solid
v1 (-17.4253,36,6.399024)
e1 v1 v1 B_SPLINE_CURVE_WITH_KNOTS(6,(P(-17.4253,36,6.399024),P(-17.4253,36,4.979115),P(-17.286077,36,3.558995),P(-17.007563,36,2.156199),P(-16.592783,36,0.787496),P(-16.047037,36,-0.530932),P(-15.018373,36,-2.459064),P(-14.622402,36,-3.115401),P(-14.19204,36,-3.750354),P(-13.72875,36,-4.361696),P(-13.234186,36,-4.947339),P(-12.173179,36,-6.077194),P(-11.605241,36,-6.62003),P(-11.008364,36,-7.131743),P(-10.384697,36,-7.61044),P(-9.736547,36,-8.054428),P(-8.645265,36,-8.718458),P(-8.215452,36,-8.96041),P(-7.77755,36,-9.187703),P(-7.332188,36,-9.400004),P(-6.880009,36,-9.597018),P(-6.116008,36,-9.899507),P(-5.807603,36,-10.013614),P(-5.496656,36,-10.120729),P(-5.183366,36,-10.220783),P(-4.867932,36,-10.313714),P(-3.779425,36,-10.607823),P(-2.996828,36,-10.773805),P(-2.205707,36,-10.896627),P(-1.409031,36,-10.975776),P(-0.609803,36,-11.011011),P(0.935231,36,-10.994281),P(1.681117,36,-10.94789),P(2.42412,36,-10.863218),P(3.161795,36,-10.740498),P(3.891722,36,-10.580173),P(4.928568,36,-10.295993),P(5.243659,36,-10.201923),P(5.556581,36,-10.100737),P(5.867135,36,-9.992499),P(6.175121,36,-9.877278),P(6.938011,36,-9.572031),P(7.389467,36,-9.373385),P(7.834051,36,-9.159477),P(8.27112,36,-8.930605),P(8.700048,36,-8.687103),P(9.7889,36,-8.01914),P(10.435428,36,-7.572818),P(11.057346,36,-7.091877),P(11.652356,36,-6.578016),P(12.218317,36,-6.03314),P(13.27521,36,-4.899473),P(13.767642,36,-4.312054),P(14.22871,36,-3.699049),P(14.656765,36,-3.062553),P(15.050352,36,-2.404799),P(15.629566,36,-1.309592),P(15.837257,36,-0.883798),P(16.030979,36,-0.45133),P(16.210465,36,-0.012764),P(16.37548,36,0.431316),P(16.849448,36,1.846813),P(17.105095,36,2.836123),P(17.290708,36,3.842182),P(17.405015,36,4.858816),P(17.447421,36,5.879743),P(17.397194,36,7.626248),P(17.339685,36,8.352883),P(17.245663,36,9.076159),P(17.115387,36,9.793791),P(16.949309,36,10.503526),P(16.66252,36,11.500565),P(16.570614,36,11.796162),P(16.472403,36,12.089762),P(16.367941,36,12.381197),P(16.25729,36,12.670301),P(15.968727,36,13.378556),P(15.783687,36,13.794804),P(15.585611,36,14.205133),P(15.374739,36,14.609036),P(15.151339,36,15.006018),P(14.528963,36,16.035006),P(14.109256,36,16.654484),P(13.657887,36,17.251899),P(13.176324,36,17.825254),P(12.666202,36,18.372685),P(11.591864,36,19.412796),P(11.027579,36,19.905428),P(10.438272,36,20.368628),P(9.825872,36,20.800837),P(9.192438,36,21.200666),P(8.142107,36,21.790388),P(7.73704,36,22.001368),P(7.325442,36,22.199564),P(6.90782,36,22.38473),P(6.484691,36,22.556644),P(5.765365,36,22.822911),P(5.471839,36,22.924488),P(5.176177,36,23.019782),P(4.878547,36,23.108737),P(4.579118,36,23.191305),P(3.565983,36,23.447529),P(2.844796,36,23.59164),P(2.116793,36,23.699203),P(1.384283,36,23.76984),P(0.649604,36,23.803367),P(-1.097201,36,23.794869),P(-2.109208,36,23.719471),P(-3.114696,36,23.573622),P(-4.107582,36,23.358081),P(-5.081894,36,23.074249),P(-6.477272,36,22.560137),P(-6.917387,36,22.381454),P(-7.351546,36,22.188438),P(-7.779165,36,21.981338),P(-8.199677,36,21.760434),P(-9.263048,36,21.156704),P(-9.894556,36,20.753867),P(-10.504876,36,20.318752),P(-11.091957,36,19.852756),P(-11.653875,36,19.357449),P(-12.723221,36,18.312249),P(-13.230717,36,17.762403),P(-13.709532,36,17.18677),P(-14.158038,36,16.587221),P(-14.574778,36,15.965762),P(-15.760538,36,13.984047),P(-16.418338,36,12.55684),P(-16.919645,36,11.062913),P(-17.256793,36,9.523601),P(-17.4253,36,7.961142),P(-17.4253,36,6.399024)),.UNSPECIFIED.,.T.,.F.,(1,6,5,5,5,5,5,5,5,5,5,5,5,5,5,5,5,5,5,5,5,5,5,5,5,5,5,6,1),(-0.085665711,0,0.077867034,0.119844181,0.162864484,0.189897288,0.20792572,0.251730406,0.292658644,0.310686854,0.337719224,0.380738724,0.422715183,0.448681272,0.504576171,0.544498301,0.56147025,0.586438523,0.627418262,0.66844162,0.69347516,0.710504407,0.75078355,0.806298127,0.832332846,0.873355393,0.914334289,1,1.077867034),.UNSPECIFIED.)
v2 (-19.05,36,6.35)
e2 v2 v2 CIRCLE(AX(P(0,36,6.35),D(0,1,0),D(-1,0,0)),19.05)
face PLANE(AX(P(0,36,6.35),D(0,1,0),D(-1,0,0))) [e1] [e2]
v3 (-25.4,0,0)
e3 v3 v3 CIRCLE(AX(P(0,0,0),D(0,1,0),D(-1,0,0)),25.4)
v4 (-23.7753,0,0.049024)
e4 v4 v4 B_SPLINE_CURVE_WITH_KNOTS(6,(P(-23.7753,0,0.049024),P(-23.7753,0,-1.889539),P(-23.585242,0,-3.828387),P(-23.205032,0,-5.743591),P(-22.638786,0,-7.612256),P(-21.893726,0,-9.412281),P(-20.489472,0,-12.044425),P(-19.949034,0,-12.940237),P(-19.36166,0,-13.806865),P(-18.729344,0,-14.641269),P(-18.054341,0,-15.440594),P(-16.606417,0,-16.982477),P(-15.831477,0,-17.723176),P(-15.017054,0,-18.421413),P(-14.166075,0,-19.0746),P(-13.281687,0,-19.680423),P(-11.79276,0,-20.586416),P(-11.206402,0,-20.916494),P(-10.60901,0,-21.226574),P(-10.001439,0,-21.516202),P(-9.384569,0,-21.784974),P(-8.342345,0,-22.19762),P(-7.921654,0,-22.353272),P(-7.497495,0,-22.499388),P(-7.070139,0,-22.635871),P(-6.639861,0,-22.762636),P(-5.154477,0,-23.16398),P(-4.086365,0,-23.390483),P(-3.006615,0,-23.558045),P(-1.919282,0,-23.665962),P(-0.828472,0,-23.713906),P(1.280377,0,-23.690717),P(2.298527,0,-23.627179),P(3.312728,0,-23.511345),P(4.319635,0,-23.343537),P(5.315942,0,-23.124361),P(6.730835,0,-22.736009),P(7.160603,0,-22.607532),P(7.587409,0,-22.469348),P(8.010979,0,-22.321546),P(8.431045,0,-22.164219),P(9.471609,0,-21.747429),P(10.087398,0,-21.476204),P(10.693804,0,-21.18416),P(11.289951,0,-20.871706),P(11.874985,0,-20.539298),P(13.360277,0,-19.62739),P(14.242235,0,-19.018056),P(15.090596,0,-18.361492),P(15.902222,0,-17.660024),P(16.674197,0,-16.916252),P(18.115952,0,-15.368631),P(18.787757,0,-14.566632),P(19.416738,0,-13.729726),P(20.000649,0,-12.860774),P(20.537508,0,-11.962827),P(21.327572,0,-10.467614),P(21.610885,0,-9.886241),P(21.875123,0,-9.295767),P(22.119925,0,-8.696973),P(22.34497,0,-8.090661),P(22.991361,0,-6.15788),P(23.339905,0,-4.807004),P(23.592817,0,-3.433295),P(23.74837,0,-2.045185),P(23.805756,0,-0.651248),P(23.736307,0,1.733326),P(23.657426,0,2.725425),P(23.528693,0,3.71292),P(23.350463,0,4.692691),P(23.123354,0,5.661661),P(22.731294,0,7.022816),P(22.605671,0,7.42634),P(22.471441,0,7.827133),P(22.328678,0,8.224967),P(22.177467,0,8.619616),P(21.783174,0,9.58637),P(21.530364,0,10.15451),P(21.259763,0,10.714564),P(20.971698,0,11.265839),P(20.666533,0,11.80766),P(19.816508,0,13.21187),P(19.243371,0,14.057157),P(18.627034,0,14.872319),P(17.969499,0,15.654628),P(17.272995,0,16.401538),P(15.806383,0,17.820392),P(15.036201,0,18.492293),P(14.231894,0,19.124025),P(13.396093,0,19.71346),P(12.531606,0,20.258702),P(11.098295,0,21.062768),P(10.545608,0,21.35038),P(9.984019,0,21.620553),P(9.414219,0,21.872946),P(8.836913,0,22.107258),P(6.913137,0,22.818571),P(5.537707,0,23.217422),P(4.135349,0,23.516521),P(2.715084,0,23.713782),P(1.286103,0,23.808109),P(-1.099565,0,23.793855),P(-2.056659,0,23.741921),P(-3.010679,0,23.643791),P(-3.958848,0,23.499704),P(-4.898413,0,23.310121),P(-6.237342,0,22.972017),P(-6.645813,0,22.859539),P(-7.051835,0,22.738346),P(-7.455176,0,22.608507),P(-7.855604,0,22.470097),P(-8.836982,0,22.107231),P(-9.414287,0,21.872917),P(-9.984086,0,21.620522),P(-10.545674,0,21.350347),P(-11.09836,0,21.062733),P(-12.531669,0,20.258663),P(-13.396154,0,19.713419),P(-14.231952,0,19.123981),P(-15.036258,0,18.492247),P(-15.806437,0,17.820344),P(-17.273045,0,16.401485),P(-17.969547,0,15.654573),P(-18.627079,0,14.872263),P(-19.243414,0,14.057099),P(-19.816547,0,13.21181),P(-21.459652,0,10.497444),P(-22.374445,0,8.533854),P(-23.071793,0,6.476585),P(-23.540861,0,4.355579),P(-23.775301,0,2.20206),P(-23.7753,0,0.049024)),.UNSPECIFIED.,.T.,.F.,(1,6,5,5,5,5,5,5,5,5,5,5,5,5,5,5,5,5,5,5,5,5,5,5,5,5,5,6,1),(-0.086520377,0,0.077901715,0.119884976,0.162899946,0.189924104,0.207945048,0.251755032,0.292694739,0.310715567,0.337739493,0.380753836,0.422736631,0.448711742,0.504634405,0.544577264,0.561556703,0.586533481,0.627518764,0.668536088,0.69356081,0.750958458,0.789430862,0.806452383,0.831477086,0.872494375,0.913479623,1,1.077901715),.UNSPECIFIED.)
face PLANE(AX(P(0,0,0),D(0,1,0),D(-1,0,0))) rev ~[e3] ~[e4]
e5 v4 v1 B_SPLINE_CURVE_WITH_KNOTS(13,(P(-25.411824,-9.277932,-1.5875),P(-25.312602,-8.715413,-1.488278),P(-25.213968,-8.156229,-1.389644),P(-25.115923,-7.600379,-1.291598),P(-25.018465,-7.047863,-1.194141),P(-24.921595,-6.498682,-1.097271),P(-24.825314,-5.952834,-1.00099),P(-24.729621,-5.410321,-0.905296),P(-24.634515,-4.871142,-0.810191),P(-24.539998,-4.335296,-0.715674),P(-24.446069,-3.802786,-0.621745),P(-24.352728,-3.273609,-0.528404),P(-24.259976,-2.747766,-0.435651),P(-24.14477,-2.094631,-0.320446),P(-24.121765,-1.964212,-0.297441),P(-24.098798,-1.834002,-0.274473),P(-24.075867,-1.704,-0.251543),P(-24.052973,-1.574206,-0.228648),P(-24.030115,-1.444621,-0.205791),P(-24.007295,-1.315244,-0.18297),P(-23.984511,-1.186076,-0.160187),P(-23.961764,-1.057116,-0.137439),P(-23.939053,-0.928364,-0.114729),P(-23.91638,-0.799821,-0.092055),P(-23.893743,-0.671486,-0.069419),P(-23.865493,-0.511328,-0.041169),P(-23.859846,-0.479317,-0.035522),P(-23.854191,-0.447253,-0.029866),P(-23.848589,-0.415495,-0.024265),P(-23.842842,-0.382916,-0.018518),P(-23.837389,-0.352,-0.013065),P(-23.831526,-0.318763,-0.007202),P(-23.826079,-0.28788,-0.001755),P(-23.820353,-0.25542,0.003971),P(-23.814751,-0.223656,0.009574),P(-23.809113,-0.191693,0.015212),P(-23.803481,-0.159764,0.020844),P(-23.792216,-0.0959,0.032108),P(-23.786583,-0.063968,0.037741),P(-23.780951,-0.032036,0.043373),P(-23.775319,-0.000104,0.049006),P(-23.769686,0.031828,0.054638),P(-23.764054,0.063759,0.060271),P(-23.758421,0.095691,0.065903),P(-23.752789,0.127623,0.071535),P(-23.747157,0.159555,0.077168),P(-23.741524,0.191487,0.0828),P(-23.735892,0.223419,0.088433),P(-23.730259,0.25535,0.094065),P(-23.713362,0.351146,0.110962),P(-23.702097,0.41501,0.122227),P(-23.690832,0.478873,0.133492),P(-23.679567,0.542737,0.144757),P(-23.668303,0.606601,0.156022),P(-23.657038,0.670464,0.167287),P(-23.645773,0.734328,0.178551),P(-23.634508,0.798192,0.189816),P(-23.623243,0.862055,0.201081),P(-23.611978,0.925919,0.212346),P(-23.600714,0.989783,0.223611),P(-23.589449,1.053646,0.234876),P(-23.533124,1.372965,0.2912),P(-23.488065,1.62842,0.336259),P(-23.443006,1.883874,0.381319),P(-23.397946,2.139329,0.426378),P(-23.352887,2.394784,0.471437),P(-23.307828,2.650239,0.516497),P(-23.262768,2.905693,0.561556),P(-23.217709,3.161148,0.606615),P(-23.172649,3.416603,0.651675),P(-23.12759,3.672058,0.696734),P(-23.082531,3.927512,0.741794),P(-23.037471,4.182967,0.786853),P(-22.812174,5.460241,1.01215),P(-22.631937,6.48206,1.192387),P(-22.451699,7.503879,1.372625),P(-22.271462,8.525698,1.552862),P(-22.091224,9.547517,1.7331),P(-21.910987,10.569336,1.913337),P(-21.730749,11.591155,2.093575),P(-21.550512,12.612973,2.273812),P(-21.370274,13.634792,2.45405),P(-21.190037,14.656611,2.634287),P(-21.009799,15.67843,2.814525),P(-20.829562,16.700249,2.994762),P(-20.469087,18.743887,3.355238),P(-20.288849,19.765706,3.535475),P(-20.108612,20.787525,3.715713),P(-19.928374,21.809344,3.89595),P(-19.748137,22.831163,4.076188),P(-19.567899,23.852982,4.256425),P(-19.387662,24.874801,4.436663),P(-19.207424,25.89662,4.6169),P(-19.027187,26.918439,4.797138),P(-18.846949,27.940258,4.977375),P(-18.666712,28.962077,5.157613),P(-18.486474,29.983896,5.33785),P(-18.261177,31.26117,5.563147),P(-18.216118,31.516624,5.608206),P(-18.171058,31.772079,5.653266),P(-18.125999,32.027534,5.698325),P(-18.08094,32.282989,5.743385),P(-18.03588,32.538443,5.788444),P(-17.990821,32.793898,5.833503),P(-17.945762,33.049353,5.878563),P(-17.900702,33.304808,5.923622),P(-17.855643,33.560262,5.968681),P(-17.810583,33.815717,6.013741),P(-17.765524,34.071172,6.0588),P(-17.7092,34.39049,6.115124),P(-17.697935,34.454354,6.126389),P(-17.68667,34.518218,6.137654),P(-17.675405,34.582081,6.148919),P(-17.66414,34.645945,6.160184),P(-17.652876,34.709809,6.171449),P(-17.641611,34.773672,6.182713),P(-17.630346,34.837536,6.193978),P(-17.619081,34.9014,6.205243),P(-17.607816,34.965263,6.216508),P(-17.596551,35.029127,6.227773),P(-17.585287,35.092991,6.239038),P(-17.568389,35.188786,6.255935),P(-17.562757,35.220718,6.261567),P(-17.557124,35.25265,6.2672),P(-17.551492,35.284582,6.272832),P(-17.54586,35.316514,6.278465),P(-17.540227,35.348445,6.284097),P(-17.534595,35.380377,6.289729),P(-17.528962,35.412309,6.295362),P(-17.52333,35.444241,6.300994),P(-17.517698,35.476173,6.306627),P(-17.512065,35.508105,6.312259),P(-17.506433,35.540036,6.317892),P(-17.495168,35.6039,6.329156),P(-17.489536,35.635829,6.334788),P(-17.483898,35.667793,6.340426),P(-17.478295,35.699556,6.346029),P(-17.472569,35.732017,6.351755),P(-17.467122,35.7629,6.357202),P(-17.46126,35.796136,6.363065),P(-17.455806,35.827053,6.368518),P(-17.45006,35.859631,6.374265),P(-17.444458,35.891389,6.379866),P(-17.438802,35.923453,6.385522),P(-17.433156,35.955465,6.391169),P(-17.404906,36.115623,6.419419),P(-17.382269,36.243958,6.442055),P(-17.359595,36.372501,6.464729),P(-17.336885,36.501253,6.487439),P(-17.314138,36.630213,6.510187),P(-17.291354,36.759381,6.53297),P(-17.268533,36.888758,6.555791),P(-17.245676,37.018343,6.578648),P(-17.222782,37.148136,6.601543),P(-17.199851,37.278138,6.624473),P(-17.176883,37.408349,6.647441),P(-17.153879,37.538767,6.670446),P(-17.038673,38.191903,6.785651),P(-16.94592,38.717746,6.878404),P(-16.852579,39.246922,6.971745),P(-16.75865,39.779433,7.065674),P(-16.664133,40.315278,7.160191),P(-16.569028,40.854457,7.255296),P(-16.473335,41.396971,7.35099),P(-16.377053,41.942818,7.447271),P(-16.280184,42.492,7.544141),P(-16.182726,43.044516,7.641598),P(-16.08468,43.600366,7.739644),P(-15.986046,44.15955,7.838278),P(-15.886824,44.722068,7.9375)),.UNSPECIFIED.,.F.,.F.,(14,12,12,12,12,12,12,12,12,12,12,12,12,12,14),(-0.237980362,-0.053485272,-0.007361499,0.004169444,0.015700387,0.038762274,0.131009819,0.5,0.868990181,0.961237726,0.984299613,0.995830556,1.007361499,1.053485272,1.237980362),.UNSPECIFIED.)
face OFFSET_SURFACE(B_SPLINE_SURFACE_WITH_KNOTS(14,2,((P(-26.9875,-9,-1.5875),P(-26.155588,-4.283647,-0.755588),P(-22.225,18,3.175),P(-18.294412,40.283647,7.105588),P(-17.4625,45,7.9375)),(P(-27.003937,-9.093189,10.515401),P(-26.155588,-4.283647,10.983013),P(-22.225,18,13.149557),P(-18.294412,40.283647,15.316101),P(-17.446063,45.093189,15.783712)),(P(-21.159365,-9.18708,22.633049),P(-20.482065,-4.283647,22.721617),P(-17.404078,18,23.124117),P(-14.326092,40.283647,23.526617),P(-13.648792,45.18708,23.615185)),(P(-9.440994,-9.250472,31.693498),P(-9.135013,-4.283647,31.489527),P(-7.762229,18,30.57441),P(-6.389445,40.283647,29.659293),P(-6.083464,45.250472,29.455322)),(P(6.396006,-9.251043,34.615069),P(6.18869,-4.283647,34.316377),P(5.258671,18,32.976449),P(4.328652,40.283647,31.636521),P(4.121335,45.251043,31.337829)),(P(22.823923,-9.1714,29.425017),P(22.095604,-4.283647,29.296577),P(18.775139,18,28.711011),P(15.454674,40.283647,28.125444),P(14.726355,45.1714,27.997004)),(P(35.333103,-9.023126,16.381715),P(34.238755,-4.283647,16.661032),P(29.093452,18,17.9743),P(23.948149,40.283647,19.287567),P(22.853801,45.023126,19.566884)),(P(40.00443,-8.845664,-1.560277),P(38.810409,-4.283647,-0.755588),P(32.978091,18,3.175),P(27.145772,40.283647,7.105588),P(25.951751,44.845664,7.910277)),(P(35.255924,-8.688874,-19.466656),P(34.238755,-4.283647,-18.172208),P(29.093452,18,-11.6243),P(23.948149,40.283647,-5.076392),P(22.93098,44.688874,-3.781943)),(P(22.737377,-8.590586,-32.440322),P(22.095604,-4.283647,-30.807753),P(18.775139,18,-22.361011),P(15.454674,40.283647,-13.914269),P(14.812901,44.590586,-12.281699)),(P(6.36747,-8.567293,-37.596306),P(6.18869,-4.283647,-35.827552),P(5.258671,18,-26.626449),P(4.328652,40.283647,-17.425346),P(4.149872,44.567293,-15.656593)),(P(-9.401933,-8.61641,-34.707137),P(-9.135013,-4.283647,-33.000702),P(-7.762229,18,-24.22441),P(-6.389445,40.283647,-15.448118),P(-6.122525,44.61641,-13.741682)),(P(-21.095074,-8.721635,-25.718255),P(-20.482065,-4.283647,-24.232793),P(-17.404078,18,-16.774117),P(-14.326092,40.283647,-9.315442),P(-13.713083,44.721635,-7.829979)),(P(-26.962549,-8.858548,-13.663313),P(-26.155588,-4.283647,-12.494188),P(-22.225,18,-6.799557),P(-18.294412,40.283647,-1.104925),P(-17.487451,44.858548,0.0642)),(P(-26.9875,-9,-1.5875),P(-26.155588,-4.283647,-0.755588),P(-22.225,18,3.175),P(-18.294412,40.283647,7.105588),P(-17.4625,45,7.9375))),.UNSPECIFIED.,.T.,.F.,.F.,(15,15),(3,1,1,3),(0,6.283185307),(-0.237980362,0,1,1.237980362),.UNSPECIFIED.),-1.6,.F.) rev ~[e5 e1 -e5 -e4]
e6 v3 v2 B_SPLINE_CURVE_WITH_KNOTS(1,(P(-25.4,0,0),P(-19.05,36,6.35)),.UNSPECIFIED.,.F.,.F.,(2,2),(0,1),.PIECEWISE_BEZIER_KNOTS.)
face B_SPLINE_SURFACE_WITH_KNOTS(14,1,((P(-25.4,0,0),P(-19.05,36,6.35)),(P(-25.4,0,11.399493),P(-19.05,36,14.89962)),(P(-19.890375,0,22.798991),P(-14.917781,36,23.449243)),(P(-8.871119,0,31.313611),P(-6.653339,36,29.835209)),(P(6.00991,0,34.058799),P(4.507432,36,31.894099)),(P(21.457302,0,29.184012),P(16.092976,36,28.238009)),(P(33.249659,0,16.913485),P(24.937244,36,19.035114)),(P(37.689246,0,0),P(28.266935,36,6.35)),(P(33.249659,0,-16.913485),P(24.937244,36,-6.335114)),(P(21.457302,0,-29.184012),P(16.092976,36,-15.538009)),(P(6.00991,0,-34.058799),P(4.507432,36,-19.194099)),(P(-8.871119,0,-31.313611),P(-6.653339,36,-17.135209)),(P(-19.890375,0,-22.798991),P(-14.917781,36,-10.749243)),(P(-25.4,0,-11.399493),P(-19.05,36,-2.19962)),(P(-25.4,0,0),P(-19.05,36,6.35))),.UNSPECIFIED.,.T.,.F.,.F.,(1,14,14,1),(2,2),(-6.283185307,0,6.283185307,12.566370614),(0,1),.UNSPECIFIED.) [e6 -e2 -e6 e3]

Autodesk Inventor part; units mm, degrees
ref_plane "YZ Plane" through (0, 0, 0) normal (1, 0, 0) x (0, 1, 0)
ref_plane "XY Plane" through (0, 0, 0) normal (0, 0, 1) x (1, 0, 0)
sketch "Szkic6" plane through (0, 0, 0) normal (0, 1, 0) x (-1, 0, 0)
  circle A0 centre (0, 0) radius 25.4
  dimension "d33" = 50.8
ref_plane "Płaszczyzna konstrukcyjna1" through (0, 36, 0) normal (0, 1, 0) x (-1, 0, 0)
sketch "Szkic7" plane through (0, 36, 0) normal (0, 1, 0) x (-1, 0, 0)
  circle A0 centre (0, 6.35) radius 19.05
  line L0 (0, -20.3) -> (0, 20.3) construction
  circle A1 centre (0, 0) radius 25.4 construction
  dimension "d35" = 38.1
loft "Wyciągnięcie złożone1" add profiles "Szkic6", "Szkic7"
shell "Skorupa1" thickness 1.6 removed faces 2 at (0.7654, 36, 15.693) at (7.2508, 0, -1.9085)
equation "\"d33\" = OD1"
equation "\"d35\" = OD2"
equation "\"d52\" = THK"
equation "\"SzerokośćGięciaPodcięcia\" = Grubość"
equation "\"RozmiarPodcięciaNarożnika\" = 4 * Grubość"
equation "\"PromieńPrzejścia\" = PromieńGięcia"
equation "\"Rozmiar_promienia_Jacobiego\" = PromieńGięcia"
equation "\"Wielk_odstępu\" = Grubość"
equation "\"d2\" = PromieńGięcia"
equation "\"d23\" = PromieńGięcia"
equation "\"OD1\" = 50.8"
equation "\"OD2\" = 38.1"
equation "\"L\" = 36"
equation "\"THK\" = 1.6"
equation "\"d34\" = L"
equation "\"Grubość\" = 1.5"
equation "\"PromieńGięcia\" = 3"
properties part number "Redukcja asymetryczna Ø50,8x38,1x1,6 L=36" material "304"
